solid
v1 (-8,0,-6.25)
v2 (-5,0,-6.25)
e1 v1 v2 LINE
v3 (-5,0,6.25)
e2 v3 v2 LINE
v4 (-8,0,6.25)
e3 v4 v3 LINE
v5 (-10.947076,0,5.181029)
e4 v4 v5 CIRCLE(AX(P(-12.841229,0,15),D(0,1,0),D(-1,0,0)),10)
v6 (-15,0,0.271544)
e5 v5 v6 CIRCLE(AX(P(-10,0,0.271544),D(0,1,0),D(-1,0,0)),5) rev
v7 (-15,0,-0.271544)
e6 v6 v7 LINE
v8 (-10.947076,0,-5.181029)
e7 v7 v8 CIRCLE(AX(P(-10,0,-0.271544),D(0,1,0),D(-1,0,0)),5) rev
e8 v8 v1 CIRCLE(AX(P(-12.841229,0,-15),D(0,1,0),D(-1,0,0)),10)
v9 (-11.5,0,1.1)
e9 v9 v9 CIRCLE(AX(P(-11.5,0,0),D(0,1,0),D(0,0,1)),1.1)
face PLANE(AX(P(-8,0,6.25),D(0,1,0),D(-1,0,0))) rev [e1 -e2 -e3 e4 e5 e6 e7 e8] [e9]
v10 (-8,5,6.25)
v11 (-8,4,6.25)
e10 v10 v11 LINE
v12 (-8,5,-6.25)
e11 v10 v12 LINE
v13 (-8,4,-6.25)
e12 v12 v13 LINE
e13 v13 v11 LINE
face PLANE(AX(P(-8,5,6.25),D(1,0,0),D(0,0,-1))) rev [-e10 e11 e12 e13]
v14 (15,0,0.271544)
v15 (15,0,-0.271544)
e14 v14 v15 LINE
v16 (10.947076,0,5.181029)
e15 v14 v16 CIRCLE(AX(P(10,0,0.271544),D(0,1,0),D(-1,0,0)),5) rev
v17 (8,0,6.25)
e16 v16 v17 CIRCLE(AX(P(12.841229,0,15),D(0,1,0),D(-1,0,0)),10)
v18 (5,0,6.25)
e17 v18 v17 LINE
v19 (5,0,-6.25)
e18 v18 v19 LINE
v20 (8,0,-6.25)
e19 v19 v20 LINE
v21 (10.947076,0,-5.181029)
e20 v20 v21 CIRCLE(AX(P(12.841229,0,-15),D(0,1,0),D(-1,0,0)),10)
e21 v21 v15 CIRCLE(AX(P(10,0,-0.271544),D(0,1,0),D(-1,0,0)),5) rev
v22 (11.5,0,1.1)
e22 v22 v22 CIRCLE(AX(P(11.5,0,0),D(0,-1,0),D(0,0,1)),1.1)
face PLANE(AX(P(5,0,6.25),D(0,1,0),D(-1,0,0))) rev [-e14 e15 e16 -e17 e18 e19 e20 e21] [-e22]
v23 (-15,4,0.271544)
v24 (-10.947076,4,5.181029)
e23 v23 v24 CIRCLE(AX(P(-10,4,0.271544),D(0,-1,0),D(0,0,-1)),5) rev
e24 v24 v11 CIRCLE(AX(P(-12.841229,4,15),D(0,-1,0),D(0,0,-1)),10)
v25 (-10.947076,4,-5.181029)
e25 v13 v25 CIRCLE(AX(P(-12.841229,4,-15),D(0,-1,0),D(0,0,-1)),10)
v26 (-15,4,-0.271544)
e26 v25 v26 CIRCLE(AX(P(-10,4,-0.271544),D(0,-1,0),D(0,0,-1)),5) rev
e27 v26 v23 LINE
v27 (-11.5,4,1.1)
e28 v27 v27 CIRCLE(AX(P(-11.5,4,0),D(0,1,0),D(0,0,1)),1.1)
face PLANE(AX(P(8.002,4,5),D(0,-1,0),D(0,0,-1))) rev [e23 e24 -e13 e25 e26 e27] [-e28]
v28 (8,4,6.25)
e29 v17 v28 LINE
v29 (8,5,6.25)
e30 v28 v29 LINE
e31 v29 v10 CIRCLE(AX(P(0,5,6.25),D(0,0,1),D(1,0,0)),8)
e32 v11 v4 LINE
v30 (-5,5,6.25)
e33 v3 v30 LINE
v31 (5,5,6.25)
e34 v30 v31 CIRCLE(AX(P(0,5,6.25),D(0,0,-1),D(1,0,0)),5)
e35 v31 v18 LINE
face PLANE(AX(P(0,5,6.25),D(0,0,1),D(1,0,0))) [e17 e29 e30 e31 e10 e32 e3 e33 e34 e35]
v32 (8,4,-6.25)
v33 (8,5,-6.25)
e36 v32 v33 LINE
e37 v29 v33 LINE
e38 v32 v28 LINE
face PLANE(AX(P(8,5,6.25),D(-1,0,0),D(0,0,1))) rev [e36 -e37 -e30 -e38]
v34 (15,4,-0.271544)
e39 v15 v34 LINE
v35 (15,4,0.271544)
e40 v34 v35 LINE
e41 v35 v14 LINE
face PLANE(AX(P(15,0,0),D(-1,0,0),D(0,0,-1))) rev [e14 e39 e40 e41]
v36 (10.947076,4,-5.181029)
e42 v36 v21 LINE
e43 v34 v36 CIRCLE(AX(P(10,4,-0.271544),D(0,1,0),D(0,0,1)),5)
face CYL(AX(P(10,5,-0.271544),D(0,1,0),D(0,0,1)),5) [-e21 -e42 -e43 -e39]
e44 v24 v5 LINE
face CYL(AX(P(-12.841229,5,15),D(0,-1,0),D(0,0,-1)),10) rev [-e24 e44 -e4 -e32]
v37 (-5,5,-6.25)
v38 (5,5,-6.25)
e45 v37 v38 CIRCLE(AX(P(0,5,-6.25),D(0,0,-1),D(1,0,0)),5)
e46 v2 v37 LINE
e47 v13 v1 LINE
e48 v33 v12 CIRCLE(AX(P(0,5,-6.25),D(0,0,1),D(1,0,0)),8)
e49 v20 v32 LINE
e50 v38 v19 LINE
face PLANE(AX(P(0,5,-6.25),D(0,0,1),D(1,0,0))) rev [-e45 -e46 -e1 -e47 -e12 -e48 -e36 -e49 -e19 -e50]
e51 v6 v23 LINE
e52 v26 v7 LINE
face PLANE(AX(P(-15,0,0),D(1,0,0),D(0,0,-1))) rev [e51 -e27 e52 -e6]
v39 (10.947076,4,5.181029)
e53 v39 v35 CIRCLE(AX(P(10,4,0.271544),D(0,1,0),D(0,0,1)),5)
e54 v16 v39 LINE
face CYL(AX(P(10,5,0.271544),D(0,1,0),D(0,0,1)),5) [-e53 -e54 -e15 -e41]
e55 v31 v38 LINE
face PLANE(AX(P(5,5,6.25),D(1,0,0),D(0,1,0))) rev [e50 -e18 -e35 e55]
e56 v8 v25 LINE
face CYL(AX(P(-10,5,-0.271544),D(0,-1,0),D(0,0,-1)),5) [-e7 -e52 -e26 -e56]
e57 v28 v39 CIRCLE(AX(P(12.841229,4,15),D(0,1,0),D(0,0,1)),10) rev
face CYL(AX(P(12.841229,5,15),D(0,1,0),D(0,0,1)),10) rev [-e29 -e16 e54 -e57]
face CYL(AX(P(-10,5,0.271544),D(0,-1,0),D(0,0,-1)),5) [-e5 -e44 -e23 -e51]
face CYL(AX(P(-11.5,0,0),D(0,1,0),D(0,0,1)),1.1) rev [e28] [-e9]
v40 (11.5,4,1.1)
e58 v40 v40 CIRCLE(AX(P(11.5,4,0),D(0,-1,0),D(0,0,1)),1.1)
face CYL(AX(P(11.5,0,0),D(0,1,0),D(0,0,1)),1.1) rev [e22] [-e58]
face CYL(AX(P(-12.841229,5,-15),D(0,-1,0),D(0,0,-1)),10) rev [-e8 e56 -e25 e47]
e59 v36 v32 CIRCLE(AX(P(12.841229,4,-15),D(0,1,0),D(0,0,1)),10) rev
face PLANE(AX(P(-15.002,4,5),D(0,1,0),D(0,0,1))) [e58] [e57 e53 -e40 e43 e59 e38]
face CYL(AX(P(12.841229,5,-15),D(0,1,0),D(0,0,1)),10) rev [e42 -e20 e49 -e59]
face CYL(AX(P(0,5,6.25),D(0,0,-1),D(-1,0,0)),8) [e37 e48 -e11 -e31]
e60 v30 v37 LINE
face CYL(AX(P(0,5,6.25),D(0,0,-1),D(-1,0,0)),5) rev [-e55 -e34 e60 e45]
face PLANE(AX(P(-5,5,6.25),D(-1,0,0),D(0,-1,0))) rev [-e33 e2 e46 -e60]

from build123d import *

# Parameters (mm, degrees)
BOSS_EXTRUDE1_DEPTH = 6.25
BOSS_EXTRUDE4_REACH = 29.149
SKETCH5_W           = 10
SKETCH5_H           = 4
FILLET1_R           = 10
FILLET2_R           = 5
SKETCH7_R           = 1.1
CUT_EXTRUDE2_DEPTH  = 19.575858103
FILLET6_R           = 10
FILLET7_R           = 5


with BuildPart() as part:
    # Sketch1 → Boss-Extrude1 (new, symmetric)
    with BuildSketch(Plane.XY):
        with BuildLine():
            Line((5, 5), (5, 0))
            Line((5, 0), (8, 0))
            Line((8, 0), (8, 5))
            ThreePointArc((8, 5), (0, 13), (-8, 5))
            Line((-8, 5), (-8, 0))
            Line((-8, 0), (-5, 0))
            Line((-5, 0), (-5, 5))
            ThreePointArc((-5, 5), (0, 10), (5, 5))
        make_face()
    extrude(amount=BOSS_EXTRUDE1_DEPTH, both=True)

    # Sketch5 → Boss-Extrude4 (add, up to next)
    with BuildSketch(Plane(origin=(-15, 0, 0), x_dir=(0, 0, -1), z_dir=(1, 0, 0)), mode=Mode.PRIVATE) as boss_extrude4_sk1:
        with Locations((0, 2)):
            Rectangle(SKETCH5_W, SKETCH5_H)
    boss_extrude4_tool1 = extrude(boss_extrude4_sk1.sketch, amount=BOSS_EXTRUDE4_REACH, mode=Mode.PRIVATE) - part.part
    boss_extrude4 = boss_extrude4_tool1.solids().sort_by_distance((-15, 2, 0))[0]
    add(boss_extrude4)

    # Fillet1
    # the kernel refuses this fillet: 10 mm, written as the material it adds along each edge
    with BuildSketch(Plane(origin=(-8, 0, -5), x_dir=(0, 0, -1), z_dir=(0, 1, 0)), Plane(origin=(-8, 4, 5), x_dir=(0, 0, 1), z_dir=(0, -1, 0))) as fillet1_piece_1:
        with BuildLine():
            CenterArc((10, 4.841229183), FILLET1_R, 180, 28.955024372)
            Line((0, 4.841229183), (-0.2, 4.841229183))
            Line((-0.2, 4.841229183), (-0.2, 0))
            Line((-0.2, 0), (0, -0.2))
            ThreePointArc((0, -0.2), (0.625, -0.2), (1.075, -0.096824584))
            Line((1.075, -0.096824584), (1.25, 0))
        make_face()
    extrude(amount=4)

    # Fillet2
    fillet2_edges = [part.edges().sort_by_distance(p)[0] for p in [
        (-15, 2, -5),
        (-15, 2, 5),
    ]]
    fillet(fillet2_edges, radius=FILLET2_R)

    # Sketch7 → Cut-Extrude2 (cut, through all)
    with BuildSketch(Plane(origin=(0, 4, 0), x_dir=(1, 0, 0), z_dir=(0, 1, 0))):
        with Locations(Location((-11.5, 0, 0), (0, 0, 270))):
            Circle(SKETCH7_R)
    cut_extrude2 = extrude(amount=-CUT_EXTRUDE2_DEPTH, mode=Mode.SUBTRACT)

    # Mirror6: Boss-Extrude4 across plane
    add(boss_extrude4.mirror(Plane(origin=(0, 0, 0), x_dir=(0, 0, 1), z_dir=(1, 0, 0))))

    # Mirror7: Cut-Extrude2 across plane
    add(cut_extrude2.mirror(Plane(origin=(0, 0, 0), x_dir=(0, 0, 1), z_dir=(1, 0, 0))), mode=Mode.SUBTRACT)

    # Fillet6
    # the kernel refuses this fillet: 10 mm, written as the material it adds along each edge
    with BuildSketch(Plane(origin=(8, 4, 5), x_dir=(0, 0, 1), z_dir=(0, -1, 0)), Plane(origin=(8, 0, -5), x_dir=(0, 0, -1), z_dir=(0, 1, 0))) as fillet6_piece_1:
        with BuildLine():
            CenterArc((10, -4.841229183), FILLET6_R, 151.044975628, 28.955024372)
            Line((0, -4.841229183), (-0.2, -4.841229183))
            Line((-0.2, -4.841229183), (-0.2, 0))
            Line((-0.2, 0), (0, 0.2))
            ThreePointArc((0, 0.2), (0.625, 0.2), (1.075, 0.096824584))
            Line((1.075, 0.096824584), (1.25, 0))
        make_face()
    extrude(amount=4)

    # Fillet7
    fillet7_edges = [part.edges().sort_by_distance(p)[0] for p in [
        (15, 2, 5),
        (15, 2, -5),
    ]]
    fillet(fillet7_edges, radius=FILLET7_R)


solid = part.part
